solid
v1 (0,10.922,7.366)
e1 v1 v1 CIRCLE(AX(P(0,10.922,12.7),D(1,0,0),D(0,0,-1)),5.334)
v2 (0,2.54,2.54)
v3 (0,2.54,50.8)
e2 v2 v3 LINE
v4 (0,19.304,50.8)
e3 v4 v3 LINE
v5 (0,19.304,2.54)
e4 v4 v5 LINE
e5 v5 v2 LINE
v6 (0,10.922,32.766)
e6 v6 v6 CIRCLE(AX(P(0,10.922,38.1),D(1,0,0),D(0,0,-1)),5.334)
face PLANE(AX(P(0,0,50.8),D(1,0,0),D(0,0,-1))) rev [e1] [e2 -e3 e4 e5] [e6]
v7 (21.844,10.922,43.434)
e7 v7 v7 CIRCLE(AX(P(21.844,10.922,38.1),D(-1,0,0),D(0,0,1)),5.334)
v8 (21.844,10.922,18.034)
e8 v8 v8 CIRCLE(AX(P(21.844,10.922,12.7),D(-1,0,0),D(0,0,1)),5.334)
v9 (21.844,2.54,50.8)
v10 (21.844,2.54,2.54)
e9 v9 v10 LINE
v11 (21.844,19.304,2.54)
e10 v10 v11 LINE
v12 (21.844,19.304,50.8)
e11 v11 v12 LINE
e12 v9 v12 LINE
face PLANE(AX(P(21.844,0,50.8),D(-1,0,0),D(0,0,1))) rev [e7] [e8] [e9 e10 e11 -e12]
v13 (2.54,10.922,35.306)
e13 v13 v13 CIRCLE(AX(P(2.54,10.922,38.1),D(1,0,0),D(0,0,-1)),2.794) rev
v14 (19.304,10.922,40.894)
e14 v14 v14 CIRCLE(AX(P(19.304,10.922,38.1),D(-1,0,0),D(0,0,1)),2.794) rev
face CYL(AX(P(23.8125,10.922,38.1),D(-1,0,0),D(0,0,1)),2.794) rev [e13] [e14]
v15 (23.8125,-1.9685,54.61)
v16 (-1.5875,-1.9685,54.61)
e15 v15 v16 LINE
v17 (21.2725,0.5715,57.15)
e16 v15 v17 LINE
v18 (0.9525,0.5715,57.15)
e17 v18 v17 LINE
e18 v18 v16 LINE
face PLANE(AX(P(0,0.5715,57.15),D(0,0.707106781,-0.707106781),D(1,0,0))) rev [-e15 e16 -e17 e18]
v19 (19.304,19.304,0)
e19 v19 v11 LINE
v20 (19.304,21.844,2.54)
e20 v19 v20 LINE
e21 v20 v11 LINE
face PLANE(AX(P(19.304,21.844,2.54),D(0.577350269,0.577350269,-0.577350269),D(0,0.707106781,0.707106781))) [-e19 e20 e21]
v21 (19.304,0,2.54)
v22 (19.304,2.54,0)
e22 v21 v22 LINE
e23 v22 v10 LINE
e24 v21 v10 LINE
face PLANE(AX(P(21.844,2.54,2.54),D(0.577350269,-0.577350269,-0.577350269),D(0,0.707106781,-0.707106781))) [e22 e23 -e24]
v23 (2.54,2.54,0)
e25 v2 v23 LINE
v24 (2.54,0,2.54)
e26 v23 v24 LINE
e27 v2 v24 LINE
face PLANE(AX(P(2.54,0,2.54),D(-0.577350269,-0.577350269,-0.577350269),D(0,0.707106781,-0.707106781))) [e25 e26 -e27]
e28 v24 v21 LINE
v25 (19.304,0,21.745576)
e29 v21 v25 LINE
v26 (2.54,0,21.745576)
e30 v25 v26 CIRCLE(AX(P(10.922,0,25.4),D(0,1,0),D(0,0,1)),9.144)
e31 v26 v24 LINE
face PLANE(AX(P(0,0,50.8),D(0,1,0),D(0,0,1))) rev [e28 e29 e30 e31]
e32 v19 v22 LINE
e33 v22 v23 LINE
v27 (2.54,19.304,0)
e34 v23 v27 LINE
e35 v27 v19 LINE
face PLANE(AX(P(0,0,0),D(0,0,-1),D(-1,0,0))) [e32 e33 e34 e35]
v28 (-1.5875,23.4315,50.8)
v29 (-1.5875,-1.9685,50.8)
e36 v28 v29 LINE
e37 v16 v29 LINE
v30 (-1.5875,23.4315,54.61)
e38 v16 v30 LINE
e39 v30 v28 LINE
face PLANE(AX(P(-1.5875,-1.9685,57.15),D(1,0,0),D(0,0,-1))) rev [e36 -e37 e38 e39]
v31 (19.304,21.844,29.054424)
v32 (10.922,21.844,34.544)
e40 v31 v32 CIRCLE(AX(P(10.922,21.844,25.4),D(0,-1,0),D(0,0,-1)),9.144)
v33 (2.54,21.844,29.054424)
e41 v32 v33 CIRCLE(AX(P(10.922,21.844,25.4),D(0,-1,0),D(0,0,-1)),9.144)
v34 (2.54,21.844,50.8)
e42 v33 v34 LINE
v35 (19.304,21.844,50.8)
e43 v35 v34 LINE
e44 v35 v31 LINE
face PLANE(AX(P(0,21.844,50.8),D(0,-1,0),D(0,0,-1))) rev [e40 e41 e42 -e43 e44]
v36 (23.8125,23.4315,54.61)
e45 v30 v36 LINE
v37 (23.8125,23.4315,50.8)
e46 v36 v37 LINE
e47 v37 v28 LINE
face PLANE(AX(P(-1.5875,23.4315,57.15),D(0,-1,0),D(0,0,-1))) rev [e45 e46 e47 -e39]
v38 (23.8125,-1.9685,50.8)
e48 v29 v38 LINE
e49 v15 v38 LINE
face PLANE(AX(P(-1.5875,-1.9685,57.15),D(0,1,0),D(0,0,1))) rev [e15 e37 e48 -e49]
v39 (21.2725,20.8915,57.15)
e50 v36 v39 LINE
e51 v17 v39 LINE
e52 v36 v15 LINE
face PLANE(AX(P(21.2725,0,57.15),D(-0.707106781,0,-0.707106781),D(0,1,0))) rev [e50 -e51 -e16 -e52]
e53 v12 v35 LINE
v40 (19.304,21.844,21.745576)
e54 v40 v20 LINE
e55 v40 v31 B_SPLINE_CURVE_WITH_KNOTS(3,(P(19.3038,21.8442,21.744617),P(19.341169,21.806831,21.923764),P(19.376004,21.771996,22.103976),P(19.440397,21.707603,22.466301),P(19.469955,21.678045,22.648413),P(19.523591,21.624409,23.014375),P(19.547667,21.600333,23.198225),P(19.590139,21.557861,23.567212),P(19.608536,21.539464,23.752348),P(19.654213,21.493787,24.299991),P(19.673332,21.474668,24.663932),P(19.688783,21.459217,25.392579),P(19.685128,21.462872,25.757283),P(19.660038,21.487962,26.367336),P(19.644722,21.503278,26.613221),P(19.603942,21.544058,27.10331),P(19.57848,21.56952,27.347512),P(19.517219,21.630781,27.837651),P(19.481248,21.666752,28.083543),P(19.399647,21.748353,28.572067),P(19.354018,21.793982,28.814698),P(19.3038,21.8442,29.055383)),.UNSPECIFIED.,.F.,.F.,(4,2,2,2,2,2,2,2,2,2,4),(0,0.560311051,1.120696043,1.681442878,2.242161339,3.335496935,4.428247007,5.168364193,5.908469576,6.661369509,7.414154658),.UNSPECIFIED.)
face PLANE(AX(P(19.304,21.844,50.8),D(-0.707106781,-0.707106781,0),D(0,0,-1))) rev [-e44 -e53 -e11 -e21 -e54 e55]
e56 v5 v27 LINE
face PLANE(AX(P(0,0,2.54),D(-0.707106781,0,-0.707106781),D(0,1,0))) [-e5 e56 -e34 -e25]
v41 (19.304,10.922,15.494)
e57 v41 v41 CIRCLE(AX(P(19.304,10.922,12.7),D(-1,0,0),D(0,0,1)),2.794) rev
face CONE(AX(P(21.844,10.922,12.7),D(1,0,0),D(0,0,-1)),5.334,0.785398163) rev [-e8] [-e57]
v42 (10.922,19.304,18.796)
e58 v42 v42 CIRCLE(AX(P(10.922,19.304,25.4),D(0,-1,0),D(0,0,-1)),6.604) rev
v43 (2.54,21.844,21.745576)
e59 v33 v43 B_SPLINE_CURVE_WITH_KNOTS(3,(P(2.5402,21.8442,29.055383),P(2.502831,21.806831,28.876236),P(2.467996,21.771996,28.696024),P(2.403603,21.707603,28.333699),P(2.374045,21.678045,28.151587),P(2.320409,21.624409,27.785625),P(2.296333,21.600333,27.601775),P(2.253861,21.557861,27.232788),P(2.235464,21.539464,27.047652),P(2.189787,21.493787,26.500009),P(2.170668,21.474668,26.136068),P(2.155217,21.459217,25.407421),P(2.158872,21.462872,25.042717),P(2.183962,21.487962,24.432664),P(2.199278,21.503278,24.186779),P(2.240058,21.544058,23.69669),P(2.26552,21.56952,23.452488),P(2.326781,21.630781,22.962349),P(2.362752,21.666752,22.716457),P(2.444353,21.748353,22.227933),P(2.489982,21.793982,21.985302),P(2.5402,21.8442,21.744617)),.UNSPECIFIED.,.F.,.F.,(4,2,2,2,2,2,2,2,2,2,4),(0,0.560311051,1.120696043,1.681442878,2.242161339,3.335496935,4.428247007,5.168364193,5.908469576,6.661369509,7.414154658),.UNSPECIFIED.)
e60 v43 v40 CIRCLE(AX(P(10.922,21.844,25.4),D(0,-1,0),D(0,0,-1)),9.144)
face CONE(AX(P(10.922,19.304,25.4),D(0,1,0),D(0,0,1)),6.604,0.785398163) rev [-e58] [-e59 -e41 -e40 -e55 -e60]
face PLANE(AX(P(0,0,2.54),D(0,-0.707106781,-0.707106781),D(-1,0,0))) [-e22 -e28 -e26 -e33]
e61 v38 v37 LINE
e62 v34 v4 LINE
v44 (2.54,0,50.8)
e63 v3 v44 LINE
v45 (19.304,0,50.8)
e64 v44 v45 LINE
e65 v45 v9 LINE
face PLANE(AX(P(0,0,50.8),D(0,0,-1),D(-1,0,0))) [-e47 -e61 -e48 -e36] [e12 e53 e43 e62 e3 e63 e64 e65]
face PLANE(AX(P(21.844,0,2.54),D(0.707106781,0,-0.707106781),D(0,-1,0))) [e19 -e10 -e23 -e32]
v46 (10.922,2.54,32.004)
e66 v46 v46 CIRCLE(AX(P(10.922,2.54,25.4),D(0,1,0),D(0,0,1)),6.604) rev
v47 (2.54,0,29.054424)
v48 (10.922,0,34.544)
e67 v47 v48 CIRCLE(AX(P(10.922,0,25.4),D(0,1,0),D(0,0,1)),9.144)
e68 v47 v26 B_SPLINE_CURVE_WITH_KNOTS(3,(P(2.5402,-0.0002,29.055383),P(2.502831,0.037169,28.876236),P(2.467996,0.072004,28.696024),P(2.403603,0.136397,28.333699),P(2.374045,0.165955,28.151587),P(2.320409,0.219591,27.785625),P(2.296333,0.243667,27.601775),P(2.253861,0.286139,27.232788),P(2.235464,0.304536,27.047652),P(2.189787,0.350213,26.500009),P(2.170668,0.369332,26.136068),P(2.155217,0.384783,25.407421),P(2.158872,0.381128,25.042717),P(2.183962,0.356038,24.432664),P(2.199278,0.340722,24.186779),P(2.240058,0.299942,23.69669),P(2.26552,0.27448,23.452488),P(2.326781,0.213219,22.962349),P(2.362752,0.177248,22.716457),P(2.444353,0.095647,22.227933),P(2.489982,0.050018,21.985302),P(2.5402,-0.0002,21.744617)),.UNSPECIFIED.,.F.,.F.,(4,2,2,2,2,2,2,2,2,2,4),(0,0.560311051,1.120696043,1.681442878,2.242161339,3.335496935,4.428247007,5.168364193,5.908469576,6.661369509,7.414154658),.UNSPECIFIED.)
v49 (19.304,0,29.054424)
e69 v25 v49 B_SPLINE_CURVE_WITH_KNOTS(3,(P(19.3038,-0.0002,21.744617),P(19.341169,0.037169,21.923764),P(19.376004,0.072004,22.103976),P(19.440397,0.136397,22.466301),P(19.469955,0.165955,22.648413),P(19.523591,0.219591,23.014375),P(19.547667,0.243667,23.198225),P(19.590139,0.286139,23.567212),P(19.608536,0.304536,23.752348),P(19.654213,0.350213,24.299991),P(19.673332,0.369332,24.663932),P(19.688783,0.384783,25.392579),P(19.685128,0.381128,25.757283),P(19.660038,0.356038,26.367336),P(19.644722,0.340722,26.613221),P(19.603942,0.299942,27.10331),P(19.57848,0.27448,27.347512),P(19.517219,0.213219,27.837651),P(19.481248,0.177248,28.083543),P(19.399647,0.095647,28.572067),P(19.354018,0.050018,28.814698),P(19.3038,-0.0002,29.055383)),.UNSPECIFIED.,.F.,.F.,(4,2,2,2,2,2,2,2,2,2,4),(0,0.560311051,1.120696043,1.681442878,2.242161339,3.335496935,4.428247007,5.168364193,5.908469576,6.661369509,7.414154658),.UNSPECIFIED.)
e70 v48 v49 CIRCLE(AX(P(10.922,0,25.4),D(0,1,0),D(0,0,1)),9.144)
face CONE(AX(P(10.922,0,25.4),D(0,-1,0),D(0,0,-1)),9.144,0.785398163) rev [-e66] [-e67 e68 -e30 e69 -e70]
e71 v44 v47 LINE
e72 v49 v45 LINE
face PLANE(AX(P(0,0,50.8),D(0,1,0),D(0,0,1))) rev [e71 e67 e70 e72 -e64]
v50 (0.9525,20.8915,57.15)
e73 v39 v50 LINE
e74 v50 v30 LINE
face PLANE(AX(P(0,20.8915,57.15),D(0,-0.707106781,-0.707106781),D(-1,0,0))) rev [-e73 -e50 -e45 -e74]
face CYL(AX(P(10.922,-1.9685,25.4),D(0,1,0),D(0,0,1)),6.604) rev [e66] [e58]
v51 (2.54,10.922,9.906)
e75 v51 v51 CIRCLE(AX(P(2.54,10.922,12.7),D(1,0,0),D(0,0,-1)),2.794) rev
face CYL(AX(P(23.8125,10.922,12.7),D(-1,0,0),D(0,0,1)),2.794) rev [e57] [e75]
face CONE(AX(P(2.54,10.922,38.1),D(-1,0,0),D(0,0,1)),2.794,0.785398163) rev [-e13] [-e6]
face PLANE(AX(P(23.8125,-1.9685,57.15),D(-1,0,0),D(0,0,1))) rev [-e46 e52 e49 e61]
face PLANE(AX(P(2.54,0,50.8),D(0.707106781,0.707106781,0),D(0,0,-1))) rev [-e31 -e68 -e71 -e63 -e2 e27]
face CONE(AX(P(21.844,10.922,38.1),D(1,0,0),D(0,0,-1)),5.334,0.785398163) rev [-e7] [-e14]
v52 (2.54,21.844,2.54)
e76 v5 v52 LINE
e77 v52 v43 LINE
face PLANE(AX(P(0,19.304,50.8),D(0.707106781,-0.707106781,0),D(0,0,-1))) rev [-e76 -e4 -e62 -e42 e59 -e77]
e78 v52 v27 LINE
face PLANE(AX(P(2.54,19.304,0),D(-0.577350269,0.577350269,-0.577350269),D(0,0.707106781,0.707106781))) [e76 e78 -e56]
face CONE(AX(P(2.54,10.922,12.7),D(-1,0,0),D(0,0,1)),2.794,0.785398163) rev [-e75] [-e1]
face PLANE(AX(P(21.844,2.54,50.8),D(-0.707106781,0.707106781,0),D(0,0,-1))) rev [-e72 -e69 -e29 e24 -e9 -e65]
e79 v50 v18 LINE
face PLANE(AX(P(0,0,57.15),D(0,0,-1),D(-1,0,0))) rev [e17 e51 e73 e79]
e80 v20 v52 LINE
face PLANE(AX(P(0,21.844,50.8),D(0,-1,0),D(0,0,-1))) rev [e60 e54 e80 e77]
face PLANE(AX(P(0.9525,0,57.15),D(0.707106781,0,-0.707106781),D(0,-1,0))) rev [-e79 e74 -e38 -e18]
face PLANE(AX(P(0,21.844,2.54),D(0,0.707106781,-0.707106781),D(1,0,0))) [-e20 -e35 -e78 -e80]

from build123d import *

# Parameters (mm, degrees)
SKETCH1_W           = 21.844
SKETCH1_H           = 21.844
BOSS_EXTRUDE2_DEPTH = 50.8
SKETCH2_W           = 25.4
SKETCH2_H           = 25.4
BOSS_EXTRUDE3_DEPTH = 6.35
SKETCH4_R           = 2.794
CUT_EXTRUDE2_DEPTH  = 67.198133271
SKETCH5_R           = 6.604
CUT_EXTRUDE3_DEPTH  = 67.33394917


with BuildPart() as part:
    # Sketch1 → Boss-Extrude2 (new body)
    with BuildSketch(Plane.XY):
        with Locations((10.922, 10.922)):
            Rectangle(SKETCH1_W, SKETCH1_H)
    extrude(amount=BOSS_EXTRUDE2_DEPTH)

    # Sketch2 → Boss-Extrude3 (add)
    with BuildSketch(Plane.XY.offset(50.8)):
        with Locations((11.1125, 10.7315)):
            Rectangle(SKETCH2_W, SKETCH2_H)
    extrude(amount=BOSS_EXTRUDE3_DEPTH)

    # Sketch4 → Cut-Extrude2 (cut, through all)
    with BuildSketch(Plane.ZY):
        with Locations((38.1, 10.922)):
            Circle(SKETCH4_R)
        with Locations((12.7, 10.922)):
            Circle(SKETCH4_R)
    extrude(amount=-CUT_EXTRUDE2_DEPTH, mode=Mode.SUBTRACT)

    # Sketch5 → Cut-Extrude3 (cut, through all)
    with BuildSketch(Plane(origin=(0, 21.844, 0), x_dir=(1, 0, 0), z_dir=(0, 1, 0))):
        with Locations(Location((10.922, -25.4, 0), (0, 0, 270))):
            Circle(SKETCH5_R)
    extrude(amount=-CUT_EXTRUDE3_DEPTH, mode=Mode.SUBTRACT)

    # Chamfer2
    # the kernel refuses this chamfer: 2.54 mm, written as the material it takes off along each edge
    with BuildSketch(Plane(origin=(20.150666667, 20.150666667, 1.693333333), x_dir=(0, -0.7071067811865474, -0.7071067811865477), z_dir=(0.5773502691896258, 0.5773502691896258, -0.5773502691896255)), Plane(origin=(1.693333333, 20.150666667, 1.693333333), x_dir=(-0.7071067811865476, -0.7071067811865476, 0), z_dir=(-0.5773502691896257, 0.5773502691896257, -0.5773502691896258)), Plane(origin=(20.150666667, 1.693333333, 1.693333333), x_dir=(0, -0.7071067811865476, 0.7071067811865474), z_dir=(0.5773502691896257, -0.5773502691896256, -0.5773502691896257))) as chamfer2_piece_1:
        Polygon((-1.796051224, 1.036950658), (1.796051224, 1.036950658), (0, -2.073901316), align=None)
    extrude(amount=3.226233304, mode=Mode.SUBTRACT)
    with BuildSketch(Plane(origin=(1.693333333, 1.693333333, 1.693333333), x_dir=(0.7071067811865476, 0, -0.7071067811865474), z_dir=(-0.5773502691896255, -0.5773502691896256, -0.5773502691896261))) as chamfer2_piece_2:
        Polygon((-1.796051224, -1.036950658), (1.796051224, -1.036950658), (0, 2.073901316), align=None)
    extrude(amount=3.226233304, mode=Mode.SUBTRACT)
    with BuildSketch(Plane(origin=(-1.5875, 29.963574789, 57.15), x_dir=(-0.027495876610586334, 0, -0.9996219169112968), z_dir=(0, -1, 0)), Plane(origin=(-8.119574789, -1.9685, 57.15), x_dir=(0, -0.02749587661058642, -0.9996219169112968), z_dir=(1, 0, 0)), Plane(origin=(23.8125, -8.500574789, 57.15), x_dir=(0.02749587661058591, 0, -0.9996219169112968), z_dir=(0, 1, 0))) as chamfer2_piece_3:
        with BuildLine():
            Line((2.612829916, 0), (-0.143629773, 2.608879196))
            Line((-0.143629773, 2.608879196), (-0.194410567, 2.607482405))
            ThreePointArc((-0.194410567, 2.607482405), (-0.086688237, 1.304030487), (-0.050780793, -0.001396791))
            Line((-0.050780793, -0.001396791), (0.001396791, -0.050780793))
            ThreePointArc((0.001396791, -0.050780793), (1.306824068, -0.01487335), (2.614226706, -0.050780793))
            Line((2.614226706, -0.050780793), (2.612829916, 0))
        make_face()
    extrude(amount=38.464149579, mode=Mode.SUBTRACT)
    with BuildSketch(Plane(origin=(30.344574789, 23.4315, 57.15), x_dir=(0, -0.9996219169112966, 0.027495876610587302), z_dir=(-1, 0, 0))) as chamfer2_piece_4:
        with BuildLine():
            Line((2.612829916, 0), (-0.143629773, -2.608879196))
            Line((-0.143629773, -2.608879196), (-0.194410567, -2.607482405))
            ThreePointArc((-0.194410567, -2.607482405), (-0.086688237, -1.304030487), (-0.050780793, 0.001396791))
            Line((-0.050780793, 0.001396791), (0.001396791, 0.050780793))
            ThreePointArc((0.001396791, 0.050780793), (1.306824068, 0.01487335), (2.614226706, 0.050780793))
            Line((2.614226706, 0.050780793), (2.612829916, 0))
        make_face()
    extrude(amount=38.464149579, mode=Mode.SUBTRACT)
    with BuildSketch(Plane(origin=(21.844, 10.922, 38.1), x_dir=(0, 0, 1), z_dir=(0, -1, 0))) as chamfer2_piece_5:
        with BuildLine():
            Line((5.405842049, -0.071842049), (2.722157951, 2.611842049))
            Line((2.722157951, 2.611842049), (2.671357951, 2.611842049))
            ThreePointArc((2.671357951, 2.611842049), (2.7432, 1.305921024), (2.7432, 0))
            Line((2.7432, 0), (2.794, -0.0508))
            ThreePointArc((2.794, -0.0508), (4.099921024, -0.0508), (5.405842049, -0.122642049))
            Line((5.405842049, -0.122642049), (5.405842049, -0.071842049))
        make_face()
    revolve(axis=Axis((21.844, 10.922, 38.1), (-1, 0, 0)), mode=Mode.SUBTRACT)
    with BuildSketch(Plane(origin=(0, 10.922, 38.1), x_dir=(0, 0, 1), z_dir=(0, -1, 0))) as chamfer2_piece_6:
        with BuildLine():
            Line((5.405842049, 0.071842049), (2.722157951, -2.611842049))
            Line((2.722157951, -2.611842049), (2.671357951, -2.611842049))
            ThreePointArc((2.671357951, -2.611842049), (2.7432, -1.305921024), (2.7432, 0))
            Line((2.7432, 0), (2.794, 0.0508))
            ThreePointArc((2.794, 0.0508), (4.099921024, 0.0508), (5.405842049, 0.122642049))
            Line((5.405842049, 0.122642049), (5.405842049, 0.071842049))
        make_face()
    revolve(axis=Axis((0, 10.922, 38.1), (-1, 0, 0)), mode=Mode.SUBTRACT)
    with BuildSketch(Plane(origin=(21.844, 10.922, 12.7), x_dir=(0, 0, 1), z_dir=(0, -1, 0))) as chamfer2_piece_7:
        with BuildLine():
            Line((5.405842049, -0.071842049), (2.722157951, 2.611842049))
            Line((2.722157951, 2.611842049), (2.671357951, 2.611842049))
            ThreePointArc((2.671357951, 2.611842049), (2.7432, 1.305921024), (2.7432, 0))
            Line((2.7432, 0), (2.794, -0.0508))
            ThreePointArc((2.794, -0.0508), (4.099921024, -0.0508), (5.405842049, -0.122642049))
            Line((5.405842049, -0.122642049), (5.405842049, -0.071842049))
        make_face()
    revolve(axis=Axis((21.844, 10.922, 12.7), (-1, 0, 0)), mode=Mode.SUBTRACT)
    with BuildSketch(Plane(origin=(0, 10.922, 12.7), x_dir=(0, 0, 1), z_dir=(0, -1, 0))) as chamfer2_piece_8:
        with BuildLine():
            Line((5.405842049, 0.071842049), (2.722157951, -2.611842049))
            Line((2.722157951, -2.611842049), (2.671357951, -2.611842049))
            ThreePointArc((2.671357951, -2.611842049), (2.7432, -1.305921024), (2.7432, 0))
            Line((2.7432, 0), (2.794, 0.0508))
            ThreePointArc((2.794, 0.0508), (4.099921024, 0.0508), (5.405842049, 0.122642049))
            Line((5.405842049, 0.122642049), (5.405842049, 0.071842049))
        make_face()
    revolve(axis=Axis((0, 10.922, 12.7), (-1, 0, 0)), mode=Mode.SUBTRACT)
    with BuildSketch(Plane(origin=(10.922, 0, 25.4), x_dir=(0, 0, 1), z_dir=(-1, 0, 0))) as chamfer2_piece_9:
        with BuildLine():
            Line((9.215842049, -0.071842049), (6.532157951, 2.611842049))
            Line((6.532157951, 2.611842049), (6.481357951, 2.611842049))
            ThreePointArc((6.481357951, 2.611842049), (6.5532, 1.305921024), (6.5532, 0))
            Line((6.5532, 0), (6.604, -0.0508))
            ThreePointArc((6.604, -0.0508), (7.909921024, -0.0508), (9.215842049, -0.122642049))
            Line((9.215842049, -0.122642049), (9.215842049, -0.071842049))
        make_face()
    revolve(axis=Axis((10.922, 0, 25.4), (0, 1, 0)), mode=Mode.SUBTRACT)
    with BuildSketch(Plane(origin=(10.922, 21.844, 25.4), x_dir=(0, 0, 1), z_dir=(-1, 0, 0))) as chamfer2_piece_10:
        with BuildLine():
            Line((9.215842049, 0.071842049), (6.532157951, -2.611842049))
            Line((6.532157951, -2.611842049), (6.481357951, -2.611842049))
            ThreePointArc((6.481357951, -2.611842049), (6.5532, -1.305921024), (6.5532, 0))
            Line((6.5532, 0), (6.604, 0.0508))
            ThreePointArc((6.604, 0.0508), (7.909921024, 0.0508), (9.215842049, 0.122642049))
            Line((9.215842049, 0.122642049), (9.215842049, 0.071842049))
        make_face()
    revolve(axis=Axis((10.922, 21.844, 25.4), (0, 1, 0)), mode=Mode.SUBTRACT)
    with BuildSketch(Plane(origin=(28.376074789, 21.844, 0), x_dir=(0, 0.027495876610585925, 0.9996219169112968), z_dir=(-1, 0, 0)), Plane(origin=(21.844, -6.532074789, 0), x_dir=(0.027495876610585925, 0, 0.9996219169112968), z_dir=(0, 1, 0)), Plane(origin=(-6.532074789, 0, 0), x_dir=(0, -0.027495876610586376, 0.9996219169112968), z_dir=(1, 0, 0)), Plane(origin=(0, 28.376074789, 0), x_dir=(-0.027495876610586376, 0, 0.9996219169112968), z_dir=(0, -1, 0))) as chamfer2_piece_11:
        with BuildLine():
            Line((2.612829916, 0), (-0.143629773, -2.608879196))
            Line((-0.143629773, -2.608879196), (-0.194410567, -2.607482405))
            ThreePointArc((-0.194410567, -2.607482405), (-0.086688237, -1.304030487), (-0.050780793, 0.001396791))
            Line((-0.050780793, 0.001396791), (0.001396791, 0.050780793))
            ThreePointArc((0.001396791, 0.050780793), (1.306824068, 0.01487335), (2.614226706, 0.050780793))
            Line((2.614226706, 0.050780793), (2.612829916, 0))
        make_face()
    extrude(amount=34.908149579, mode=Mode.SUBTRACT)
    with BuildSketch(Plane(origin=(0, 21.844, -6.532074789), x_dir=(0.9996219169112968, 0.027495876610585935, 0), z_dir=(0, 0, 1)), Plane(origin=(21.844, 21.844, -6.532074789), x_dir=(0.02749587661058595, -0.9996219169112968, 0), z_dir=(0, 0, 1)), Plane(origin=(21.844, 0, -6.532074789), x_dir=(-0.9996219169112966, -0.0274958766105864, 0), z_dir=(0, 0, 1))) as chamfer2_piece_12:
        with BuildLine():
            Line((2.612829916, 0), (-0.143629773, -2.608879196))
            Line((-0.143629773, -2.608879196), (-0.194410567, -2.607482405))
            ThreePointArc((-0.194410567, -2.607482405), (-0.086688237, -1.304030487), (-0.050780793, 0.001396791))
            Line((-0.050780793, 0.001396791), (0.001396791, 0.050780793))
            ThreePointArc((0.001396791, 0.050780793), (1.306824068, 0.01487335), (2.614226706, 0.050780793))
            Line((2.614226706, 0.050780793), (2.612829916, 0))
        make_face()
    extrude(amount=57.332074789, mode=Mode.SUBTRACT)
    with BuildSketch(Plane(origin=(0, 0, -6.532074789), x_dir=(0.9996219169112966, -0.02749587661058636, 0), z_dir=(0, 0, 1))) as chamfer2_piece_13:
        with BuildLine():
            Line((2.612829916, 0), (-0.143629773, 2.608879196))
            Line((-0.143629773, 2.608879196), (-0.194410567, 2.607482405))
            ThreePointArc((-0.194410567, 2.607482405), (-0.086688237, 1.304030487), (-0.050780793, -0.001396791))
            Line((-0.050780793, -0.001396791), (0.001396791, -0.050780793))
            ThreePointArc((0.001396791, -0.050780793), (1.306824068, -0.01487335), (2.614226706, -0.050780793))
            Line((2.614226706, -0.050780793), (2.612829916, 0))
        make_face()
    extrude(amount=57.332074789, mode=Mode.SUBTRACT)


solid = part.part
